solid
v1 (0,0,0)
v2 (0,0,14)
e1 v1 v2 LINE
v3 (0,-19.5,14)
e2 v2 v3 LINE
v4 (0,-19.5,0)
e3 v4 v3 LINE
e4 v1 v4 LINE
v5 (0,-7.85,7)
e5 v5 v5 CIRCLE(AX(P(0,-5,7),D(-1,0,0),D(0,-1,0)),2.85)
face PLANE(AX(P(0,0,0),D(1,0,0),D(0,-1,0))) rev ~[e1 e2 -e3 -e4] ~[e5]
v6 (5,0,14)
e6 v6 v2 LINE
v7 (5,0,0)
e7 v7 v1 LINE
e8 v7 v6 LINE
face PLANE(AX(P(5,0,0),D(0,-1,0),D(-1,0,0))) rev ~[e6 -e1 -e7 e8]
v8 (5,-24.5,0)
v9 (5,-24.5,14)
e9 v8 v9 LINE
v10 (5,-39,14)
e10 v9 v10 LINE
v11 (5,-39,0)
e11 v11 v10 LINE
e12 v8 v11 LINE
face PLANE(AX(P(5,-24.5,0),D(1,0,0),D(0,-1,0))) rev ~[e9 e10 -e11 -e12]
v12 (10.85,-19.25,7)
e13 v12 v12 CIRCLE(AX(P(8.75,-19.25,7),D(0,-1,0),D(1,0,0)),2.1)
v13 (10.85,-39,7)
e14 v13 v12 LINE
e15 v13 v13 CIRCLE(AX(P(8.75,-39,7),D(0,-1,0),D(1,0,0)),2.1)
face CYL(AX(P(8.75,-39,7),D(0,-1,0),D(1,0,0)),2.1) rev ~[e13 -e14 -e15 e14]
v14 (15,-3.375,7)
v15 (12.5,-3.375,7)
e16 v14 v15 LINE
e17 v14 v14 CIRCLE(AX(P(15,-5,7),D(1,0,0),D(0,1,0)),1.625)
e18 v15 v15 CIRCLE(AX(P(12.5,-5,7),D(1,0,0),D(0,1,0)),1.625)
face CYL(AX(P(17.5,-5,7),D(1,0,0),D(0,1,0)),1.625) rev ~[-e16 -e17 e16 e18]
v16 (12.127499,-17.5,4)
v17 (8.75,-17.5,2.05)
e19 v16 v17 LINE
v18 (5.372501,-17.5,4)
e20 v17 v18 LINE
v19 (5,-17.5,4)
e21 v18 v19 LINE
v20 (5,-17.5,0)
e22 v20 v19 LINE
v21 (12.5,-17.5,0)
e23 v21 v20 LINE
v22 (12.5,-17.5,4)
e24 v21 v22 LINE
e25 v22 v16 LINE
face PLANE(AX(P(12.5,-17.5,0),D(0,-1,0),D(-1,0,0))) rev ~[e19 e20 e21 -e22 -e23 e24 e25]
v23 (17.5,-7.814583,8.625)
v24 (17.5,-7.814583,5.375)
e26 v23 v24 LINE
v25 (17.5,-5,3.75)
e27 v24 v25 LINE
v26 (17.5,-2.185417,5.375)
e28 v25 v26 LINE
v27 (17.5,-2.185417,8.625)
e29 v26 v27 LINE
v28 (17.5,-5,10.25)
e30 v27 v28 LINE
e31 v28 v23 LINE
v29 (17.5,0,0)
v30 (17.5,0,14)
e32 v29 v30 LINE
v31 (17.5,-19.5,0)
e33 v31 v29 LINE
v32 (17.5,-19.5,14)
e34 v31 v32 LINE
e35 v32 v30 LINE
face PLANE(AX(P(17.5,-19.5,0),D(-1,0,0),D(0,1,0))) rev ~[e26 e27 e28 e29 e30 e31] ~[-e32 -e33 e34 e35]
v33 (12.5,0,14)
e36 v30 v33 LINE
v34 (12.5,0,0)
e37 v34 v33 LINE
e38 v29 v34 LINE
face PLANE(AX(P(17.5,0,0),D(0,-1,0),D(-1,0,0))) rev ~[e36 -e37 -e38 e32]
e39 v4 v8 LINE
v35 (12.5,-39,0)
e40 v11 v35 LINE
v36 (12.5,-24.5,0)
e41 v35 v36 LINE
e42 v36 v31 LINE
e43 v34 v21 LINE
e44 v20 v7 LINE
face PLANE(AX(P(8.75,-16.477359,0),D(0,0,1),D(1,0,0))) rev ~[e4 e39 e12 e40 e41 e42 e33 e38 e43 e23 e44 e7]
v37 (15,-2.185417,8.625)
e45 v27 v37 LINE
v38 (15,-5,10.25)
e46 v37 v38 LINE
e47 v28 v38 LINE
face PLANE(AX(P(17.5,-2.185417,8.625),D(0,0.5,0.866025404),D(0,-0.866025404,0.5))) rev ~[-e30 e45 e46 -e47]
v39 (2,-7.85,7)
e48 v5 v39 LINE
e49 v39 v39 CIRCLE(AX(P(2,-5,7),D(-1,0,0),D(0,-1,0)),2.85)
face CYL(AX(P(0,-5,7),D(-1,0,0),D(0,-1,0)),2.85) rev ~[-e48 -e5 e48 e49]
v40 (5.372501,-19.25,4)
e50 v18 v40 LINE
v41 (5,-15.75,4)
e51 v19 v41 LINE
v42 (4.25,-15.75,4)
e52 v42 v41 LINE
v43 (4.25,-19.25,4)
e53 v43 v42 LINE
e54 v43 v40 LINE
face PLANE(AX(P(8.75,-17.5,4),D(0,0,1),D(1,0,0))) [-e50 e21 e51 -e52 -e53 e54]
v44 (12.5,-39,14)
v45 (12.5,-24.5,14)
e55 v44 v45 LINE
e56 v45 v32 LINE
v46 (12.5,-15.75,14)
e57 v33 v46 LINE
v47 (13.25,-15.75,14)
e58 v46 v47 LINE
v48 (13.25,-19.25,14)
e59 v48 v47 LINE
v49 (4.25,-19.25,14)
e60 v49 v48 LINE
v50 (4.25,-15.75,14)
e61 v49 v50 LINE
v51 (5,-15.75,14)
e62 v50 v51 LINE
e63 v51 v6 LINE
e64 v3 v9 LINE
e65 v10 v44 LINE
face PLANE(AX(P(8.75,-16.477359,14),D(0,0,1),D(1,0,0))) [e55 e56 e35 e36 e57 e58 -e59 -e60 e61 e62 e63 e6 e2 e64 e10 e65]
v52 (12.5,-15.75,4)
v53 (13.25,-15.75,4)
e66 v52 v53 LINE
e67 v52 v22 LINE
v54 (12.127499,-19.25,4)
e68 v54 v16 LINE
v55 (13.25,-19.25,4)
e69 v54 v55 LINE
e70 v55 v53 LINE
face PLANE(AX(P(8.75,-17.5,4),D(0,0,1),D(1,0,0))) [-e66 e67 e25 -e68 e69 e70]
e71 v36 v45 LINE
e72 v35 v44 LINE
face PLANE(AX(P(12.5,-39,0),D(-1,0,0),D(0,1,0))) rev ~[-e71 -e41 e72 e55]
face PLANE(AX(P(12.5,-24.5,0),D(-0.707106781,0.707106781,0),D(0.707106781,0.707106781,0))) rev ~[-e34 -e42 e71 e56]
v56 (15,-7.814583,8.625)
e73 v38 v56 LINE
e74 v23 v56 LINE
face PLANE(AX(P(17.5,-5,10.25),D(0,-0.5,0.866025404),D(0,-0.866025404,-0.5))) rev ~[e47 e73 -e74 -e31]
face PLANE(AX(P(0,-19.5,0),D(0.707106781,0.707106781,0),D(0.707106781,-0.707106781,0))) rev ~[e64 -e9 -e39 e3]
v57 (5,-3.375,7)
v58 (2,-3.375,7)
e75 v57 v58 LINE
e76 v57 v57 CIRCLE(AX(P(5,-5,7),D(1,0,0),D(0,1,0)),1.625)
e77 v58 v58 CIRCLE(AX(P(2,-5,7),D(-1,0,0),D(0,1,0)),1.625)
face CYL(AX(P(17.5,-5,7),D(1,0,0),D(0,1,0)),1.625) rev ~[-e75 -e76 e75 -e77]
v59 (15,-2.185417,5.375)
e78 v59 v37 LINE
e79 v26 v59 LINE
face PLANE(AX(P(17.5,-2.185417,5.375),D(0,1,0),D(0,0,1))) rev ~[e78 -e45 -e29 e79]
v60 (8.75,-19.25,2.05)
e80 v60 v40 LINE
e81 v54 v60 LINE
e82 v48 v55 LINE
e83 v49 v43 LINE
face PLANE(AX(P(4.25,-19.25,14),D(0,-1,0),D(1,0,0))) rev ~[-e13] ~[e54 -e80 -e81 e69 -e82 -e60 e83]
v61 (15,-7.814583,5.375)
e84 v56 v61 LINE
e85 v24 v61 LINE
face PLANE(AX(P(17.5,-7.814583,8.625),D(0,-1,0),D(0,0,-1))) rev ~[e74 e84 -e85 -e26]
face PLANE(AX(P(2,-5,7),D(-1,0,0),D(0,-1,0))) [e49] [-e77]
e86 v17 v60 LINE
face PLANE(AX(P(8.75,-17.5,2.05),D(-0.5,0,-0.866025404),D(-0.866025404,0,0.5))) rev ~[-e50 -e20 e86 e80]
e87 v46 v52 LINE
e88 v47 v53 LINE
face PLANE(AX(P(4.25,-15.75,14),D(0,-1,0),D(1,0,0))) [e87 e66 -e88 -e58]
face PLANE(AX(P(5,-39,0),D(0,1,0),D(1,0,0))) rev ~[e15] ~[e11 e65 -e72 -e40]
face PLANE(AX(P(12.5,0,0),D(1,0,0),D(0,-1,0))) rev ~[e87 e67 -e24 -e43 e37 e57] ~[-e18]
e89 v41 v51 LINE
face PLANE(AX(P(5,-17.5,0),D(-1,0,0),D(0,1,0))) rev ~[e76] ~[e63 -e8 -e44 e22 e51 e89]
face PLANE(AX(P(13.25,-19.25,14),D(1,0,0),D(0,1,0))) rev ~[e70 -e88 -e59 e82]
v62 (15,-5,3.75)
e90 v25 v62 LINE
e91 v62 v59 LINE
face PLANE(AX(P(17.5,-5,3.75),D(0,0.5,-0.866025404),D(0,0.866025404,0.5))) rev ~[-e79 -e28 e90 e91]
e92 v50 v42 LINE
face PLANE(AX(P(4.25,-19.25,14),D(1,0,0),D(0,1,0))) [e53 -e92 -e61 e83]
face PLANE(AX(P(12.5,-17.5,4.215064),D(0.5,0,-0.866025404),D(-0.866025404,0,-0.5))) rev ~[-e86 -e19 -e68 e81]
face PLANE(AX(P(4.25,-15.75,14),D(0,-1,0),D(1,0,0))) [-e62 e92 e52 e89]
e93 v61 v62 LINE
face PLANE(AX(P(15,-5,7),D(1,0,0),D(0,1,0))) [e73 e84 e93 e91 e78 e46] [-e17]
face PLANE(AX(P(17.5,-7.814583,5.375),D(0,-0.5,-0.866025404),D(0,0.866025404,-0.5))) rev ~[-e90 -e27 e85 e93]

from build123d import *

# Parameters (mm, degrees)
F1_DEPTH  = 14
F2_R      = 2.1
F3_DEPTH  = 25
F5_W      = 9
F5_H      = 3.5
F6_DEPTH  = 10
F4_R      = 2.1
F7_DEPTH  = 1.75
F8_R      = 1.625
F9_DEPTH  = 2.5
F10_DEPTH = 25
F11_R     = 2.85
F11_R_2   = 1.625
F12_DEPTH = 2


with BuildPart() as f1:
    # F0 (on Top) → F1 (new body)
    with BuildSketch(Plane.XY):
        Polygon((5, 0), (0, 0), (0, -19.5), (5, -24.5), (5, -39), (12.5, -39), (12.5, -24.5), (17.5, -19.5), (17.5, 0), (12.5, 0), (12.5, -17.5), (5, -17.5), align=None)
    extrude(amount=F1_DEPTH)

    # F2 (on face) → F3 (cut)
    with BuildSketch(Plane.XZ.offset(39)):
        with Locations((8.75, 7)):
            Circle(F2_R)
    extrude(amount=-F3_DEPTH, mode=Mode.SUBTRACT)

    # F5 (on face) → F6 (cut)
    with BuildSketch(Plane.XY.offset(14)):
        with Locations((8.75, -17.5)):
            Rectangle(F5_W, F5_H)
    extrude(amount=-F6_DEPTH, mode=Mode.SUBTRACT)

    # F4 (on face) → F7 (cut)
    with BuildSketch(Plane(origin=(0, -17.5, 0), x_dir=(-1, 0, 0), z_dir=(0, 1, 0))):
        Polygon((-5, 4.2150635095), (-5, 9.7849364905), (-8.75, 11.95), (-12.5, 9.7849364905), (-12.5, 4.2150635095), (-8.75, 2.05), align=None)
        with Locations((-8.75, 7)):
            Circle(F4_R, mode=Mode.SUBTRACT)
    extrude(amount=-F7_DEPTH, mode=Mode.SUBTRACT)

    # F8 (on face) → F9 (cut)
    with BuildSketch(Plane.YZ.offset(17.5)):
        Polygon((-2.1854174377, 5.375), (-2.1854174377, 8.625), (-5, 10.25), (-7.8145825623, 8.625), (-7.8145825623, 5.375), (-5, 3.75), align=None)
        with Locations((-5, 7)):
            Circle(F8_R, mode=Mode.SUBTRACT)
    extrude(amount=-F9_DEPTH, mode=Mode.SUBTRACT)

    # F10 (cut): a face of the model
    f10_faces = [f1.faces().sort_by_distance(p)[0] for p in [
        (17.5, -5, 7),
    ]]
    extrude(f10_faces, amount=-F10_DEPTH, mode=Mode.SUBTRACT)

    # F11 (on face) → F12 (cut)
    with BuildSketch(Plane(origin=(0, 0, 0), x_dir=(0, -1, 0), z_dir=(-1, 0, 0))):
        with Locations((5, 7)):
            Circle(F11_R)
        with Locations((5, 7)):
            Circle(F11_R_2, mode=Mode.SUBTRACT)
    extrude(amount=-F12_DEPTH, mode=Mode.SUBTRACT)


solid = f1.part
